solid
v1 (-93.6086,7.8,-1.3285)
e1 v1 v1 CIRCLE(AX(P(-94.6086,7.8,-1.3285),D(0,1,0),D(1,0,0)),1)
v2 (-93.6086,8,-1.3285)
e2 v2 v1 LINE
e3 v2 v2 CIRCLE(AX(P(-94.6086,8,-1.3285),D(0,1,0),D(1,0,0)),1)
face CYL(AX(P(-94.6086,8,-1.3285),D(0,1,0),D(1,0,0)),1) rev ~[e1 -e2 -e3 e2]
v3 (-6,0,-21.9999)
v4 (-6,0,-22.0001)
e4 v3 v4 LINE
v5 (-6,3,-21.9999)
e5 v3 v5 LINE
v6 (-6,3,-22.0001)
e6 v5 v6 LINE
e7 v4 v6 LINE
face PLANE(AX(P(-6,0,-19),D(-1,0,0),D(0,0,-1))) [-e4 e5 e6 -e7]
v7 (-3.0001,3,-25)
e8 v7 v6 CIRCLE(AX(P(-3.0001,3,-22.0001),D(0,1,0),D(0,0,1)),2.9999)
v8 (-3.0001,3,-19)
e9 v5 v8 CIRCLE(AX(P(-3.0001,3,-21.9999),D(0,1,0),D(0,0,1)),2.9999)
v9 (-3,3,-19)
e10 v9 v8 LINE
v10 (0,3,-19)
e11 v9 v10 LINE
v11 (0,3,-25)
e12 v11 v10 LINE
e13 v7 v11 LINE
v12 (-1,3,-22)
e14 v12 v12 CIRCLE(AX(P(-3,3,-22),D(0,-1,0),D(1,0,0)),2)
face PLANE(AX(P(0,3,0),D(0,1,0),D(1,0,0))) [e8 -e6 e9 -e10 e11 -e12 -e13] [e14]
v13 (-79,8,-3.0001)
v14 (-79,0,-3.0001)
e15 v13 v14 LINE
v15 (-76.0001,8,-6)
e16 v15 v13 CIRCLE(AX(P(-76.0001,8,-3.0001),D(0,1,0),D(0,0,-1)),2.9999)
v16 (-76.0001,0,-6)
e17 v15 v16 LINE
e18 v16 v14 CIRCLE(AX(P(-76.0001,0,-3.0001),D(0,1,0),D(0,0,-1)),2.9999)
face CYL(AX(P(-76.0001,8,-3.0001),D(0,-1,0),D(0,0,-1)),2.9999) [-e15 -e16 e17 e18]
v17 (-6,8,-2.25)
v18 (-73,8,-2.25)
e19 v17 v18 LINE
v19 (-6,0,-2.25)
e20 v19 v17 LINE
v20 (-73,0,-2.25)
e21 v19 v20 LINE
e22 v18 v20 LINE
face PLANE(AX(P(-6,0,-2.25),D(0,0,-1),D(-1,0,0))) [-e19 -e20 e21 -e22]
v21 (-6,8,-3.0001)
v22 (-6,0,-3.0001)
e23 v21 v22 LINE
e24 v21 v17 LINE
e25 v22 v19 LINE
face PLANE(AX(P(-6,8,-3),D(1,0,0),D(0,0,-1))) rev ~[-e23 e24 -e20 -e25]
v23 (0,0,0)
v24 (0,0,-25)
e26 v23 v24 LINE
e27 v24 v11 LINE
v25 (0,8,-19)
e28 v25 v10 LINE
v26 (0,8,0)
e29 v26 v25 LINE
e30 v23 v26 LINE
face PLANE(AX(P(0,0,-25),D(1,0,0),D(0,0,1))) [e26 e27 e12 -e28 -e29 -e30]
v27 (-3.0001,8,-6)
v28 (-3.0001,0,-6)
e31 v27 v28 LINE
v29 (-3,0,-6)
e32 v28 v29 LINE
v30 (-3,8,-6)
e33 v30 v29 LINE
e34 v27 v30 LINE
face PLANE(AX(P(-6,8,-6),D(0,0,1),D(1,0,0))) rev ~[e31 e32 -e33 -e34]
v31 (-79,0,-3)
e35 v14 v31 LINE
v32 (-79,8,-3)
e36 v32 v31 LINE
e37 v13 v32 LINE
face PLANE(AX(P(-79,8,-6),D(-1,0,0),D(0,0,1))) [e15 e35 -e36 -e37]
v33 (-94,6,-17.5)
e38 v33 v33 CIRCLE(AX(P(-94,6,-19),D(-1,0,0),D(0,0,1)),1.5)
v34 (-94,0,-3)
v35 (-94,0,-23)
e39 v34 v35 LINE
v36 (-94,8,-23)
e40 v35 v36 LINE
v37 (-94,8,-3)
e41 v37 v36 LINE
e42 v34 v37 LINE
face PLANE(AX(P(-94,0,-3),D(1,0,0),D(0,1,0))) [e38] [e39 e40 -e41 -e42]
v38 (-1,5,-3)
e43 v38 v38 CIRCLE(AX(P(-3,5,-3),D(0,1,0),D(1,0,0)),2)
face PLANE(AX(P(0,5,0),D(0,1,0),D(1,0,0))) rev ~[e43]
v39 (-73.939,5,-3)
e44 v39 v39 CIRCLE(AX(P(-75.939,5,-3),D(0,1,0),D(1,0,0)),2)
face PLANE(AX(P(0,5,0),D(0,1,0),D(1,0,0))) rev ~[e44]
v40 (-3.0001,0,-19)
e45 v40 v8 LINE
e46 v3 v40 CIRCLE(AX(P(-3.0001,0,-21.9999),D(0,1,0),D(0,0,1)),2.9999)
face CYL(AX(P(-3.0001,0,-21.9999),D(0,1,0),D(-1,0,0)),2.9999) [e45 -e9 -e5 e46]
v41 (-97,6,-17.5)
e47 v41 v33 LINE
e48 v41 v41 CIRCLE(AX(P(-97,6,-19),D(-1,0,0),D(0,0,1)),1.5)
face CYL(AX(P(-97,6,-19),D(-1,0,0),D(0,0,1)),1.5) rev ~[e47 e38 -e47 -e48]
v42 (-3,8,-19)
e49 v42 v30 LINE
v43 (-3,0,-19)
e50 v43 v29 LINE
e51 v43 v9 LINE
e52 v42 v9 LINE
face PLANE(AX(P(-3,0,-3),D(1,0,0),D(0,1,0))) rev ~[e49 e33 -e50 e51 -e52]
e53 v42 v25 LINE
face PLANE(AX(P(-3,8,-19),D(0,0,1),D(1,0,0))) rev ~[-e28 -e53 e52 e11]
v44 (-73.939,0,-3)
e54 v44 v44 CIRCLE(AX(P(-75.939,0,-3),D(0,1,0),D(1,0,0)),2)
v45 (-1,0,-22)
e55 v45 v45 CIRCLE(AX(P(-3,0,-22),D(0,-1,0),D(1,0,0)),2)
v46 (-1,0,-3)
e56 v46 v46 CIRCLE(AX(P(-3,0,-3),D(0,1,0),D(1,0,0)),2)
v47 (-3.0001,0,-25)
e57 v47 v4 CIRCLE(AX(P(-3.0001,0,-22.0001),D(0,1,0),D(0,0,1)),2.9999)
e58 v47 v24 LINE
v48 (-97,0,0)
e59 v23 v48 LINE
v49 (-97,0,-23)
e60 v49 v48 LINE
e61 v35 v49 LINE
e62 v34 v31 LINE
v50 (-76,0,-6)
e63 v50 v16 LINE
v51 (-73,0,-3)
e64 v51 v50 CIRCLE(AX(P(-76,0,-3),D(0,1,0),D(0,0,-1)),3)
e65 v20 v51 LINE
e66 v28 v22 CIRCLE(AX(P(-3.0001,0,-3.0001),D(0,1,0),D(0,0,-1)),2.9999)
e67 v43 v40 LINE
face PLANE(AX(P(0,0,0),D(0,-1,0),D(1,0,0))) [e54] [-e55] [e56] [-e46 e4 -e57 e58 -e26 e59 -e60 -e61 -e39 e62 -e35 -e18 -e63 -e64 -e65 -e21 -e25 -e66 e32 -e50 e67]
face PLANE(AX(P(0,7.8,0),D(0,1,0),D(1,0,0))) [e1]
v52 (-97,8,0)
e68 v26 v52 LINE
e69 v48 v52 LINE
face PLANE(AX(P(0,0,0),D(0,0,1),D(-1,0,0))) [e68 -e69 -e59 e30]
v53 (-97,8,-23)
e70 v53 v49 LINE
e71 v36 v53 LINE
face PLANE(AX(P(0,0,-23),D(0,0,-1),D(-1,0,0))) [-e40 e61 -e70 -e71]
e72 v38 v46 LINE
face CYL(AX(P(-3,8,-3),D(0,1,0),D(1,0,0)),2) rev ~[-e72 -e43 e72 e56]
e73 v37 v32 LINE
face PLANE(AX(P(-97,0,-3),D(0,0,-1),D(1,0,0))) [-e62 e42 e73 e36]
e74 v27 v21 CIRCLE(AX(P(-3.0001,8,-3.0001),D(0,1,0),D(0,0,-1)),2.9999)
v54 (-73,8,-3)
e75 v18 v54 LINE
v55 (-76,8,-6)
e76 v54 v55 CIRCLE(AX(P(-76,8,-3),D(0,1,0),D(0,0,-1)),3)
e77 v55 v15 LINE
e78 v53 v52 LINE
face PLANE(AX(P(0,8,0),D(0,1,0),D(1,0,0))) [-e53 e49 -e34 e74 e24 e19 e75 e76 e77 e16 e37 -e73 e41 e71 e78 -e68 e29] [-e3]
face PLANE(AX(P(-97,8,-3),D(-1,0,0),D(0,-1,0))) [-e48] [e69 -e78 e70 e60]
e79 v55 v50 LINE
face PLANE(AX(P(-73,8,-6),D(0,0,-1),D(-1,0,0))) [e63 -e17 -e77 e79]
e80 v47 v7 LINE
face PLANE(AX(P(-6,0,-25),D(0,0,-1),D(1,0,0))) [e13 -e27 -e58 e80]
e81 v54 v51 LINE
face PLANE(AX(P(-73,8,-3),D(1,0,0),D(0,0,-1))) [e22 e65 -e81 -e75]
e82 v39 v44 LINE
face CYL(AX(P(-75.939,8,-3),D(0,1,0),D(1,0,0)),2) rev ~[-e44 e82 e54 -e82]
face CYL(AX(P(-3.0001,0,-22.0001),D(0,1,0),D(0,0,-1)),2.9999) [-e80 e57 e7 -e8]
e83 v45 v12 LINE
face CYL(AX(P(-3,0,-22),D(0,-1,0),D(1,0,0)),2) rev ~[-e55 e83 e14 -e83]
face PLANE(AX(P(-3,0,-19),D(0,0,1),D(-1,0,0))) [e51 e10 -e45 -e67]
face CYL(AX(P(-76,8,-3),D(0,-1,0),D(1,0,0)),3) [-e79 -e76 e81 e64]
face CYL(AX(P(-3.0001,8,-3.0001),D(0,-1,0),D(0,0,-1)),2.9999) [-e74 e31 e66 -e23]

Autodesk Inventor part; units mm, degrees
ref_plane "YZ Plane" through (0, 0, 0) normal (1, 0, 0) x (0, 1, 0)
ref_plane "XZ Plane" through (0, 0, 0) normal (0, 1, 0) x (-1, 0, 0)
ref_plane "XY Plane" through (0, 0, 0) normal (0, 0, 1) x (1, 0, 0)
sketch "Szkic1" plane through (0, 0, 0) normal (0, 1, 0) x (-1, 0, 0)
  line L0 (0, 0) -> (97, 0)
  line L1 (97, 0) -> (97, -3)
  line L2 (97, -3) -> (0, -3)
  line L3 (0, -3) -> (0, 0)
  dimension "d0" = 97
  dimension "d1" = 3
extrude "Wyciągnięcie proste1" add sketch "Szkic1" along normal blind 8
sketch "Szkic2" plane through (0, 8, 0) normal (0, 1, 0) x (1, 0, 0)
  circle A0 centre (-94.6086, 1.3285) radius 1
  point P0 (0, 0)
  dimension "d4" = 2
extrude "Wyciągnięcie proste2" cut sketch "Szkic2" against normal blind 0.2
sketch "Szkic3" plane through (0, 0, -3) normal (0, 0, -1) x (-1, 0, 0)
  line L0 (0, 8) -> (97, 8) projected
  line L1 (0, 0) -> (3, 0)
  line L2 (3, 0) -> (3, 8)
  line L3 (3, 8) -> (0, 8)
  line L4 (0, 8) -> (0, 0)
  line L5 (0, 0) -> (97, 0) projected
  line L6 (97, 0) -> (94, 0)
  line L7 (94, 0) -> (94, 8)
  line L8 (94, 8) -> (97, 8)
  line L9 (97, 8) -> (97, 0)
  dimension "d7" = 3
  dimension "d8" = 3
extrude "Wyciągnięcie proste3" add sketch "Szkic3" along normal blind 19 contours L0 L2 L1 L4
extrude "Wyciągnięcie proste4" add sketch "Szkic3" along normal blind 20 contours L0 L9 L5 L7
sketch "Szkic4" plane through (-3, 0, -3) normal (-1, 0, 0) x (0, 0, 1)
  line L0 (-19, 0) -> (-19, 8) projected
  line L1 (0, 0) -> (-19, 0) projected
  line L2 (-19, 8) -> (-14, 8)
  line L3 (-14, 8) -> (-14, 0)
  line L4 (-14, 0) -> (-19, 0)
  line L5 (-19, 0) -> (-19, 8)
  point P0 (3, 0)
  dimension "d13" = 5
extrude "Wyciągnięcie proste5" add sketch "Szkic4" along normal blind 3
sketch "Szkic5" plane through (0, 8, 0) normal (0, 1, 0) x (1, 0, 0)
  line L0 (-3, 3) -> (-3, 17) projected
  line L1 (-3, 3) -> (-6, 3)
  line L2 (-6, 3) -> (-6, 6)
  line L3 (-6, 6) -> (-3, 6)
  line L4 (-3, 6) -> (-3, 3)
  point P0 (0, 0)
  dimension "d16" = 3
  dimension "d17" = 3
extrude "Wyciągnięcie proste6" add sketch "Szkic5" against normal blind 8
sketch "Szkic6" plane through (0, 8, 0) normal (0, 1, 0) x (1, 0, 0)
  line L0 (0, 0) -> (-6, 6)
  line L1 (-97, 0) -> (0, 0) projected
  line L2 (-6, 0) -> (0, 6)
  line L3 (0, 0) -> (0, 22) projected
  circle A0 centre (-3, 3) radius 2
  dimension "d20" = 4
extrude "Wyciągnięcie proste7" cut sketch "Szkic6" against normal blind 8 contours A0 L2 L0 | L0 L2 A0 | L2 A0 L0 | L0 A0 L2
sketch "Szkic7" plane through (0, 8, 0) normal (0, 1, 0) x (1, 0, 0)
  circle A0 centre (-3, 3) radius 2 projected
  circle A1 centre (-3, 3) radius 2
  point P0 (0, 0)
extrude "Wyciągnięcie proste8" add sketch "Szkic7" against normal blind 3
sketch "Szkic8" plane through (0, 8, 0) normal (0, 1, 0) x (1, 0, 0)
  line L0 (-6, 3) -> (-94, 3) projected
  line L1 (-79, 3) -> (-73, 3)
  line L2 (-73, 3) -> (-73, 6)
  line L3 (-73, 6) -> (-79, 6)
  line L4 (-79, 6) -> (-79, 3)
  line L5 (-3, 6) -> (-3, 17) projected
  point P0 (0, 0)
  dimension "d25" = 6
  dimension "d26" = 3
  dimension "d27" = 70
extrude "Wyciągnięcie proste9" add sketch "Szkic8" against normal blind 8
sketch "Szkic9" plane through (0, 8, 0) normal (0, 1, 0) x (1, 0, 0)
  line L0 (-73, 3) -> (-73, 6) projected
  line L1 (-73, 6) -> (-78.8804, 0)
  line L2 (-97, 0) -> (0, 0) projected
  line L3 (-79, 3) -> (-79, 6) projected
  line L4 (-79, 6) -> (-72.878, 0)
  circle A0 centre (-75.939, 3) radius 2
  dimension "d30" = 4
extrude "Wyciągnięcie proste10" cut sketch "Szkic9" against normal blind 8 contours A0 L4 L1 | L1 L4 A0 | L4 A0 L1 | L1 A0 L4
sketch "Szkic10" plane through (0, 8, 0) normal (0, 1, 0) x (1, 0, 0)
  circle A0 centre (-75.939, 3) radius 2 projected
  circle A1 centre (-75.939, 3) radius 2
  point P0 (0, 0)
extrude "Wyciągnięcie proste11" add sketch "Szkic10" against normal blind 3
sketch "Szkic11" plane through (-6, 0, -3) normal (0, 0, -1) x (-1, 0, 0)
  line L0 (67, 8) -> (67, 0) projected
  line L1 (91, 0) -> (-6, 0) projected
  line L2 (67, 8) -> (54, 8)
  line L3 (54, 8) -> (54, 0)
  line L4 (54, 0) -> (67, 0)
  line L5 (67, 0) -> (67, 8)
  dimension "d35" = 13
extrude "Wyciągnięcie proste12" cut sketch "Szkic11" against normal blind 0.5
sketch "Szkic13" plane through (-6, 0, -3) normal (0, 0, -1) x (-1, 0, 0)
  line L0 (54, 0) -> (54, 8) projected
  line L1 (0, 0) -> (0, 8) projected
  line L2 (54, 8) -> (0, 8)
  line L3 (0, 8) -> (0, 0)
  line L4 (0, 0) -> (54, 0)
  line L5 (54, 0) -> (54, 8)
  point P0 (-6, 0)
extrude "Wyciągnięcie proste14" cut sketch "Szkic13" against normal blind 0.75
sketch "Szkic14" plane through (-6, 0, -2.5) normal (0, 0, -1) x (-1, 0, 0)
  line L0 (67, 0) -> (54, 0) projected
  line L1 (67, 8) -> (67, 0) projected
  line L2 (54, 0) -> (67, 0)
  line L3 (67, 0) -> (67, 8)
  line L4 (67, 8) -> (54, 8)
  line L5 (54, 8) -> (54, 0)
  point P0 (-6, 0)
extrude "Wyciągnięcie proste15" cut sketch "Szkic14" against normal blind 0.25
sketch "Szkic15" plane through (-97, 0, 0) normal (-1, 0, 0) x (0, 0, 1)
  circle A0 centre (-19, 6) radius 1.5
  line L0 (-23, 0) -> (-23, 8) projected
  line L1 (0, 8) -> (-23, 8) projected
  point P0 (0, 0)
  dimension "d44" = 3
  dimension "d45" = 4
  dimension "d46" = 2
extrude "Wyciągnięcie proste16" cut sketch "Szkic15" against normal up to surface (3 mm away)
sketch "Szkic16" plane through (0, 0, 0) normal (0, -1, 0) x (1, 0, 0)
  line L0 (-3, -6) -> (-3, -17) projected
  line L1 (-6, -22) -> (-6, -17) projected
  line L2 (-3, -17) -> (-6, -17)
  line L3 (-6, -17) -> (-6, -22)
  line L4 (-6, -22) -> (-3, -22)
  line L5 (-3, -22) -> (-3, -17)
  point P0 (0, 0)
extrude "Wyciągnięcie proste17" cut sketch "Szkic16" against normal blind 8
sketch "Szkic17" plane through (0, 0, 0) normal (0, -1, 0) x (1, 0, 0)
  line L0 (0, 0) -> (0, -22) projected
  line L1 (0, -22) -> (-3, -22)
  line L2 (-3, -22) -> (-3, -19)
  line L3 (-3, -19) -> (0, -19)
  line L4 (0, -19) -> (0, -22)
  line L5 (0, -19) -> (-6, -19)
  line L6 (-6, -19) -> (-6, -25)
  line L7 (-6, -25) -> (0, -25)
  line L8 (0, -25) -> (0, -19)
  dimension "d51" = 3
  dimension "d52" = 3
  dimension "d53" = 6
  dimension "d54" = 6
extrude "Wyciągnięcie proste18" add sketch "Szkic17" against normal blind 3 contours L8 L7 L6 L5 L2 L1
sketch "Szkic18" plane through (0, 8, 0) normal (0, 1, 0) x (1, 0, 0)
  line L0 (0, 22) -> (-3, 22) projected
  line L1 (-3, 22) -> (-3, 19) projected
  line L2 (0, 22) -> (-3, 22)
  line L3 (-3, 22) -> (-3, 19)
  line L4 (-3, 19) -> (0, 19)
  line L5 (0, 19) -> (0, 22)
  point P0 (0, 0)
extrude "Wyciągnięcie proste19" cut sketch "Szkic18" against normal blind 5
sketch "Szkic19" plane through (0, 0, 0) normal (0, -1, 0) x (1, 0, 0)
  point P0 (0, 0)
sketch "Szkic20" plane through (0, 0, 0) normal (0, -1, 0) x (1, 0, 0)
  circle A0 centre (-3, -22) radius 2
  line L0 (-6, -25) -> (0, -25) projected
  line L1 (-6, -19) -> (-6, -25) projected
  point P0 (0, 0)
  point P1 (-6, -22)
  dimension "d59" = 4
  dimension "d60" = 3
  dimension "d61" = 3
extrude "Wyciągnięcie proste20" cut sketch "Szkic20" against normal blind 3
fillet "Fillet1" radius 3 2 edges at (-6, 1.5, -25) (-6, 1.5, -19)
fillet "Fillet2" radius 3 1 edges at (-6, 4, -6)
fillet "Zaokrąglenie3" radius 3 1 edges at (-73, 4, -6)
fillet "Zaokrąglenie4" radius 3 1 edges at (-79, 4, -6)
properties part number "lewasciana" material "Tworzywo sztuczne PET"
